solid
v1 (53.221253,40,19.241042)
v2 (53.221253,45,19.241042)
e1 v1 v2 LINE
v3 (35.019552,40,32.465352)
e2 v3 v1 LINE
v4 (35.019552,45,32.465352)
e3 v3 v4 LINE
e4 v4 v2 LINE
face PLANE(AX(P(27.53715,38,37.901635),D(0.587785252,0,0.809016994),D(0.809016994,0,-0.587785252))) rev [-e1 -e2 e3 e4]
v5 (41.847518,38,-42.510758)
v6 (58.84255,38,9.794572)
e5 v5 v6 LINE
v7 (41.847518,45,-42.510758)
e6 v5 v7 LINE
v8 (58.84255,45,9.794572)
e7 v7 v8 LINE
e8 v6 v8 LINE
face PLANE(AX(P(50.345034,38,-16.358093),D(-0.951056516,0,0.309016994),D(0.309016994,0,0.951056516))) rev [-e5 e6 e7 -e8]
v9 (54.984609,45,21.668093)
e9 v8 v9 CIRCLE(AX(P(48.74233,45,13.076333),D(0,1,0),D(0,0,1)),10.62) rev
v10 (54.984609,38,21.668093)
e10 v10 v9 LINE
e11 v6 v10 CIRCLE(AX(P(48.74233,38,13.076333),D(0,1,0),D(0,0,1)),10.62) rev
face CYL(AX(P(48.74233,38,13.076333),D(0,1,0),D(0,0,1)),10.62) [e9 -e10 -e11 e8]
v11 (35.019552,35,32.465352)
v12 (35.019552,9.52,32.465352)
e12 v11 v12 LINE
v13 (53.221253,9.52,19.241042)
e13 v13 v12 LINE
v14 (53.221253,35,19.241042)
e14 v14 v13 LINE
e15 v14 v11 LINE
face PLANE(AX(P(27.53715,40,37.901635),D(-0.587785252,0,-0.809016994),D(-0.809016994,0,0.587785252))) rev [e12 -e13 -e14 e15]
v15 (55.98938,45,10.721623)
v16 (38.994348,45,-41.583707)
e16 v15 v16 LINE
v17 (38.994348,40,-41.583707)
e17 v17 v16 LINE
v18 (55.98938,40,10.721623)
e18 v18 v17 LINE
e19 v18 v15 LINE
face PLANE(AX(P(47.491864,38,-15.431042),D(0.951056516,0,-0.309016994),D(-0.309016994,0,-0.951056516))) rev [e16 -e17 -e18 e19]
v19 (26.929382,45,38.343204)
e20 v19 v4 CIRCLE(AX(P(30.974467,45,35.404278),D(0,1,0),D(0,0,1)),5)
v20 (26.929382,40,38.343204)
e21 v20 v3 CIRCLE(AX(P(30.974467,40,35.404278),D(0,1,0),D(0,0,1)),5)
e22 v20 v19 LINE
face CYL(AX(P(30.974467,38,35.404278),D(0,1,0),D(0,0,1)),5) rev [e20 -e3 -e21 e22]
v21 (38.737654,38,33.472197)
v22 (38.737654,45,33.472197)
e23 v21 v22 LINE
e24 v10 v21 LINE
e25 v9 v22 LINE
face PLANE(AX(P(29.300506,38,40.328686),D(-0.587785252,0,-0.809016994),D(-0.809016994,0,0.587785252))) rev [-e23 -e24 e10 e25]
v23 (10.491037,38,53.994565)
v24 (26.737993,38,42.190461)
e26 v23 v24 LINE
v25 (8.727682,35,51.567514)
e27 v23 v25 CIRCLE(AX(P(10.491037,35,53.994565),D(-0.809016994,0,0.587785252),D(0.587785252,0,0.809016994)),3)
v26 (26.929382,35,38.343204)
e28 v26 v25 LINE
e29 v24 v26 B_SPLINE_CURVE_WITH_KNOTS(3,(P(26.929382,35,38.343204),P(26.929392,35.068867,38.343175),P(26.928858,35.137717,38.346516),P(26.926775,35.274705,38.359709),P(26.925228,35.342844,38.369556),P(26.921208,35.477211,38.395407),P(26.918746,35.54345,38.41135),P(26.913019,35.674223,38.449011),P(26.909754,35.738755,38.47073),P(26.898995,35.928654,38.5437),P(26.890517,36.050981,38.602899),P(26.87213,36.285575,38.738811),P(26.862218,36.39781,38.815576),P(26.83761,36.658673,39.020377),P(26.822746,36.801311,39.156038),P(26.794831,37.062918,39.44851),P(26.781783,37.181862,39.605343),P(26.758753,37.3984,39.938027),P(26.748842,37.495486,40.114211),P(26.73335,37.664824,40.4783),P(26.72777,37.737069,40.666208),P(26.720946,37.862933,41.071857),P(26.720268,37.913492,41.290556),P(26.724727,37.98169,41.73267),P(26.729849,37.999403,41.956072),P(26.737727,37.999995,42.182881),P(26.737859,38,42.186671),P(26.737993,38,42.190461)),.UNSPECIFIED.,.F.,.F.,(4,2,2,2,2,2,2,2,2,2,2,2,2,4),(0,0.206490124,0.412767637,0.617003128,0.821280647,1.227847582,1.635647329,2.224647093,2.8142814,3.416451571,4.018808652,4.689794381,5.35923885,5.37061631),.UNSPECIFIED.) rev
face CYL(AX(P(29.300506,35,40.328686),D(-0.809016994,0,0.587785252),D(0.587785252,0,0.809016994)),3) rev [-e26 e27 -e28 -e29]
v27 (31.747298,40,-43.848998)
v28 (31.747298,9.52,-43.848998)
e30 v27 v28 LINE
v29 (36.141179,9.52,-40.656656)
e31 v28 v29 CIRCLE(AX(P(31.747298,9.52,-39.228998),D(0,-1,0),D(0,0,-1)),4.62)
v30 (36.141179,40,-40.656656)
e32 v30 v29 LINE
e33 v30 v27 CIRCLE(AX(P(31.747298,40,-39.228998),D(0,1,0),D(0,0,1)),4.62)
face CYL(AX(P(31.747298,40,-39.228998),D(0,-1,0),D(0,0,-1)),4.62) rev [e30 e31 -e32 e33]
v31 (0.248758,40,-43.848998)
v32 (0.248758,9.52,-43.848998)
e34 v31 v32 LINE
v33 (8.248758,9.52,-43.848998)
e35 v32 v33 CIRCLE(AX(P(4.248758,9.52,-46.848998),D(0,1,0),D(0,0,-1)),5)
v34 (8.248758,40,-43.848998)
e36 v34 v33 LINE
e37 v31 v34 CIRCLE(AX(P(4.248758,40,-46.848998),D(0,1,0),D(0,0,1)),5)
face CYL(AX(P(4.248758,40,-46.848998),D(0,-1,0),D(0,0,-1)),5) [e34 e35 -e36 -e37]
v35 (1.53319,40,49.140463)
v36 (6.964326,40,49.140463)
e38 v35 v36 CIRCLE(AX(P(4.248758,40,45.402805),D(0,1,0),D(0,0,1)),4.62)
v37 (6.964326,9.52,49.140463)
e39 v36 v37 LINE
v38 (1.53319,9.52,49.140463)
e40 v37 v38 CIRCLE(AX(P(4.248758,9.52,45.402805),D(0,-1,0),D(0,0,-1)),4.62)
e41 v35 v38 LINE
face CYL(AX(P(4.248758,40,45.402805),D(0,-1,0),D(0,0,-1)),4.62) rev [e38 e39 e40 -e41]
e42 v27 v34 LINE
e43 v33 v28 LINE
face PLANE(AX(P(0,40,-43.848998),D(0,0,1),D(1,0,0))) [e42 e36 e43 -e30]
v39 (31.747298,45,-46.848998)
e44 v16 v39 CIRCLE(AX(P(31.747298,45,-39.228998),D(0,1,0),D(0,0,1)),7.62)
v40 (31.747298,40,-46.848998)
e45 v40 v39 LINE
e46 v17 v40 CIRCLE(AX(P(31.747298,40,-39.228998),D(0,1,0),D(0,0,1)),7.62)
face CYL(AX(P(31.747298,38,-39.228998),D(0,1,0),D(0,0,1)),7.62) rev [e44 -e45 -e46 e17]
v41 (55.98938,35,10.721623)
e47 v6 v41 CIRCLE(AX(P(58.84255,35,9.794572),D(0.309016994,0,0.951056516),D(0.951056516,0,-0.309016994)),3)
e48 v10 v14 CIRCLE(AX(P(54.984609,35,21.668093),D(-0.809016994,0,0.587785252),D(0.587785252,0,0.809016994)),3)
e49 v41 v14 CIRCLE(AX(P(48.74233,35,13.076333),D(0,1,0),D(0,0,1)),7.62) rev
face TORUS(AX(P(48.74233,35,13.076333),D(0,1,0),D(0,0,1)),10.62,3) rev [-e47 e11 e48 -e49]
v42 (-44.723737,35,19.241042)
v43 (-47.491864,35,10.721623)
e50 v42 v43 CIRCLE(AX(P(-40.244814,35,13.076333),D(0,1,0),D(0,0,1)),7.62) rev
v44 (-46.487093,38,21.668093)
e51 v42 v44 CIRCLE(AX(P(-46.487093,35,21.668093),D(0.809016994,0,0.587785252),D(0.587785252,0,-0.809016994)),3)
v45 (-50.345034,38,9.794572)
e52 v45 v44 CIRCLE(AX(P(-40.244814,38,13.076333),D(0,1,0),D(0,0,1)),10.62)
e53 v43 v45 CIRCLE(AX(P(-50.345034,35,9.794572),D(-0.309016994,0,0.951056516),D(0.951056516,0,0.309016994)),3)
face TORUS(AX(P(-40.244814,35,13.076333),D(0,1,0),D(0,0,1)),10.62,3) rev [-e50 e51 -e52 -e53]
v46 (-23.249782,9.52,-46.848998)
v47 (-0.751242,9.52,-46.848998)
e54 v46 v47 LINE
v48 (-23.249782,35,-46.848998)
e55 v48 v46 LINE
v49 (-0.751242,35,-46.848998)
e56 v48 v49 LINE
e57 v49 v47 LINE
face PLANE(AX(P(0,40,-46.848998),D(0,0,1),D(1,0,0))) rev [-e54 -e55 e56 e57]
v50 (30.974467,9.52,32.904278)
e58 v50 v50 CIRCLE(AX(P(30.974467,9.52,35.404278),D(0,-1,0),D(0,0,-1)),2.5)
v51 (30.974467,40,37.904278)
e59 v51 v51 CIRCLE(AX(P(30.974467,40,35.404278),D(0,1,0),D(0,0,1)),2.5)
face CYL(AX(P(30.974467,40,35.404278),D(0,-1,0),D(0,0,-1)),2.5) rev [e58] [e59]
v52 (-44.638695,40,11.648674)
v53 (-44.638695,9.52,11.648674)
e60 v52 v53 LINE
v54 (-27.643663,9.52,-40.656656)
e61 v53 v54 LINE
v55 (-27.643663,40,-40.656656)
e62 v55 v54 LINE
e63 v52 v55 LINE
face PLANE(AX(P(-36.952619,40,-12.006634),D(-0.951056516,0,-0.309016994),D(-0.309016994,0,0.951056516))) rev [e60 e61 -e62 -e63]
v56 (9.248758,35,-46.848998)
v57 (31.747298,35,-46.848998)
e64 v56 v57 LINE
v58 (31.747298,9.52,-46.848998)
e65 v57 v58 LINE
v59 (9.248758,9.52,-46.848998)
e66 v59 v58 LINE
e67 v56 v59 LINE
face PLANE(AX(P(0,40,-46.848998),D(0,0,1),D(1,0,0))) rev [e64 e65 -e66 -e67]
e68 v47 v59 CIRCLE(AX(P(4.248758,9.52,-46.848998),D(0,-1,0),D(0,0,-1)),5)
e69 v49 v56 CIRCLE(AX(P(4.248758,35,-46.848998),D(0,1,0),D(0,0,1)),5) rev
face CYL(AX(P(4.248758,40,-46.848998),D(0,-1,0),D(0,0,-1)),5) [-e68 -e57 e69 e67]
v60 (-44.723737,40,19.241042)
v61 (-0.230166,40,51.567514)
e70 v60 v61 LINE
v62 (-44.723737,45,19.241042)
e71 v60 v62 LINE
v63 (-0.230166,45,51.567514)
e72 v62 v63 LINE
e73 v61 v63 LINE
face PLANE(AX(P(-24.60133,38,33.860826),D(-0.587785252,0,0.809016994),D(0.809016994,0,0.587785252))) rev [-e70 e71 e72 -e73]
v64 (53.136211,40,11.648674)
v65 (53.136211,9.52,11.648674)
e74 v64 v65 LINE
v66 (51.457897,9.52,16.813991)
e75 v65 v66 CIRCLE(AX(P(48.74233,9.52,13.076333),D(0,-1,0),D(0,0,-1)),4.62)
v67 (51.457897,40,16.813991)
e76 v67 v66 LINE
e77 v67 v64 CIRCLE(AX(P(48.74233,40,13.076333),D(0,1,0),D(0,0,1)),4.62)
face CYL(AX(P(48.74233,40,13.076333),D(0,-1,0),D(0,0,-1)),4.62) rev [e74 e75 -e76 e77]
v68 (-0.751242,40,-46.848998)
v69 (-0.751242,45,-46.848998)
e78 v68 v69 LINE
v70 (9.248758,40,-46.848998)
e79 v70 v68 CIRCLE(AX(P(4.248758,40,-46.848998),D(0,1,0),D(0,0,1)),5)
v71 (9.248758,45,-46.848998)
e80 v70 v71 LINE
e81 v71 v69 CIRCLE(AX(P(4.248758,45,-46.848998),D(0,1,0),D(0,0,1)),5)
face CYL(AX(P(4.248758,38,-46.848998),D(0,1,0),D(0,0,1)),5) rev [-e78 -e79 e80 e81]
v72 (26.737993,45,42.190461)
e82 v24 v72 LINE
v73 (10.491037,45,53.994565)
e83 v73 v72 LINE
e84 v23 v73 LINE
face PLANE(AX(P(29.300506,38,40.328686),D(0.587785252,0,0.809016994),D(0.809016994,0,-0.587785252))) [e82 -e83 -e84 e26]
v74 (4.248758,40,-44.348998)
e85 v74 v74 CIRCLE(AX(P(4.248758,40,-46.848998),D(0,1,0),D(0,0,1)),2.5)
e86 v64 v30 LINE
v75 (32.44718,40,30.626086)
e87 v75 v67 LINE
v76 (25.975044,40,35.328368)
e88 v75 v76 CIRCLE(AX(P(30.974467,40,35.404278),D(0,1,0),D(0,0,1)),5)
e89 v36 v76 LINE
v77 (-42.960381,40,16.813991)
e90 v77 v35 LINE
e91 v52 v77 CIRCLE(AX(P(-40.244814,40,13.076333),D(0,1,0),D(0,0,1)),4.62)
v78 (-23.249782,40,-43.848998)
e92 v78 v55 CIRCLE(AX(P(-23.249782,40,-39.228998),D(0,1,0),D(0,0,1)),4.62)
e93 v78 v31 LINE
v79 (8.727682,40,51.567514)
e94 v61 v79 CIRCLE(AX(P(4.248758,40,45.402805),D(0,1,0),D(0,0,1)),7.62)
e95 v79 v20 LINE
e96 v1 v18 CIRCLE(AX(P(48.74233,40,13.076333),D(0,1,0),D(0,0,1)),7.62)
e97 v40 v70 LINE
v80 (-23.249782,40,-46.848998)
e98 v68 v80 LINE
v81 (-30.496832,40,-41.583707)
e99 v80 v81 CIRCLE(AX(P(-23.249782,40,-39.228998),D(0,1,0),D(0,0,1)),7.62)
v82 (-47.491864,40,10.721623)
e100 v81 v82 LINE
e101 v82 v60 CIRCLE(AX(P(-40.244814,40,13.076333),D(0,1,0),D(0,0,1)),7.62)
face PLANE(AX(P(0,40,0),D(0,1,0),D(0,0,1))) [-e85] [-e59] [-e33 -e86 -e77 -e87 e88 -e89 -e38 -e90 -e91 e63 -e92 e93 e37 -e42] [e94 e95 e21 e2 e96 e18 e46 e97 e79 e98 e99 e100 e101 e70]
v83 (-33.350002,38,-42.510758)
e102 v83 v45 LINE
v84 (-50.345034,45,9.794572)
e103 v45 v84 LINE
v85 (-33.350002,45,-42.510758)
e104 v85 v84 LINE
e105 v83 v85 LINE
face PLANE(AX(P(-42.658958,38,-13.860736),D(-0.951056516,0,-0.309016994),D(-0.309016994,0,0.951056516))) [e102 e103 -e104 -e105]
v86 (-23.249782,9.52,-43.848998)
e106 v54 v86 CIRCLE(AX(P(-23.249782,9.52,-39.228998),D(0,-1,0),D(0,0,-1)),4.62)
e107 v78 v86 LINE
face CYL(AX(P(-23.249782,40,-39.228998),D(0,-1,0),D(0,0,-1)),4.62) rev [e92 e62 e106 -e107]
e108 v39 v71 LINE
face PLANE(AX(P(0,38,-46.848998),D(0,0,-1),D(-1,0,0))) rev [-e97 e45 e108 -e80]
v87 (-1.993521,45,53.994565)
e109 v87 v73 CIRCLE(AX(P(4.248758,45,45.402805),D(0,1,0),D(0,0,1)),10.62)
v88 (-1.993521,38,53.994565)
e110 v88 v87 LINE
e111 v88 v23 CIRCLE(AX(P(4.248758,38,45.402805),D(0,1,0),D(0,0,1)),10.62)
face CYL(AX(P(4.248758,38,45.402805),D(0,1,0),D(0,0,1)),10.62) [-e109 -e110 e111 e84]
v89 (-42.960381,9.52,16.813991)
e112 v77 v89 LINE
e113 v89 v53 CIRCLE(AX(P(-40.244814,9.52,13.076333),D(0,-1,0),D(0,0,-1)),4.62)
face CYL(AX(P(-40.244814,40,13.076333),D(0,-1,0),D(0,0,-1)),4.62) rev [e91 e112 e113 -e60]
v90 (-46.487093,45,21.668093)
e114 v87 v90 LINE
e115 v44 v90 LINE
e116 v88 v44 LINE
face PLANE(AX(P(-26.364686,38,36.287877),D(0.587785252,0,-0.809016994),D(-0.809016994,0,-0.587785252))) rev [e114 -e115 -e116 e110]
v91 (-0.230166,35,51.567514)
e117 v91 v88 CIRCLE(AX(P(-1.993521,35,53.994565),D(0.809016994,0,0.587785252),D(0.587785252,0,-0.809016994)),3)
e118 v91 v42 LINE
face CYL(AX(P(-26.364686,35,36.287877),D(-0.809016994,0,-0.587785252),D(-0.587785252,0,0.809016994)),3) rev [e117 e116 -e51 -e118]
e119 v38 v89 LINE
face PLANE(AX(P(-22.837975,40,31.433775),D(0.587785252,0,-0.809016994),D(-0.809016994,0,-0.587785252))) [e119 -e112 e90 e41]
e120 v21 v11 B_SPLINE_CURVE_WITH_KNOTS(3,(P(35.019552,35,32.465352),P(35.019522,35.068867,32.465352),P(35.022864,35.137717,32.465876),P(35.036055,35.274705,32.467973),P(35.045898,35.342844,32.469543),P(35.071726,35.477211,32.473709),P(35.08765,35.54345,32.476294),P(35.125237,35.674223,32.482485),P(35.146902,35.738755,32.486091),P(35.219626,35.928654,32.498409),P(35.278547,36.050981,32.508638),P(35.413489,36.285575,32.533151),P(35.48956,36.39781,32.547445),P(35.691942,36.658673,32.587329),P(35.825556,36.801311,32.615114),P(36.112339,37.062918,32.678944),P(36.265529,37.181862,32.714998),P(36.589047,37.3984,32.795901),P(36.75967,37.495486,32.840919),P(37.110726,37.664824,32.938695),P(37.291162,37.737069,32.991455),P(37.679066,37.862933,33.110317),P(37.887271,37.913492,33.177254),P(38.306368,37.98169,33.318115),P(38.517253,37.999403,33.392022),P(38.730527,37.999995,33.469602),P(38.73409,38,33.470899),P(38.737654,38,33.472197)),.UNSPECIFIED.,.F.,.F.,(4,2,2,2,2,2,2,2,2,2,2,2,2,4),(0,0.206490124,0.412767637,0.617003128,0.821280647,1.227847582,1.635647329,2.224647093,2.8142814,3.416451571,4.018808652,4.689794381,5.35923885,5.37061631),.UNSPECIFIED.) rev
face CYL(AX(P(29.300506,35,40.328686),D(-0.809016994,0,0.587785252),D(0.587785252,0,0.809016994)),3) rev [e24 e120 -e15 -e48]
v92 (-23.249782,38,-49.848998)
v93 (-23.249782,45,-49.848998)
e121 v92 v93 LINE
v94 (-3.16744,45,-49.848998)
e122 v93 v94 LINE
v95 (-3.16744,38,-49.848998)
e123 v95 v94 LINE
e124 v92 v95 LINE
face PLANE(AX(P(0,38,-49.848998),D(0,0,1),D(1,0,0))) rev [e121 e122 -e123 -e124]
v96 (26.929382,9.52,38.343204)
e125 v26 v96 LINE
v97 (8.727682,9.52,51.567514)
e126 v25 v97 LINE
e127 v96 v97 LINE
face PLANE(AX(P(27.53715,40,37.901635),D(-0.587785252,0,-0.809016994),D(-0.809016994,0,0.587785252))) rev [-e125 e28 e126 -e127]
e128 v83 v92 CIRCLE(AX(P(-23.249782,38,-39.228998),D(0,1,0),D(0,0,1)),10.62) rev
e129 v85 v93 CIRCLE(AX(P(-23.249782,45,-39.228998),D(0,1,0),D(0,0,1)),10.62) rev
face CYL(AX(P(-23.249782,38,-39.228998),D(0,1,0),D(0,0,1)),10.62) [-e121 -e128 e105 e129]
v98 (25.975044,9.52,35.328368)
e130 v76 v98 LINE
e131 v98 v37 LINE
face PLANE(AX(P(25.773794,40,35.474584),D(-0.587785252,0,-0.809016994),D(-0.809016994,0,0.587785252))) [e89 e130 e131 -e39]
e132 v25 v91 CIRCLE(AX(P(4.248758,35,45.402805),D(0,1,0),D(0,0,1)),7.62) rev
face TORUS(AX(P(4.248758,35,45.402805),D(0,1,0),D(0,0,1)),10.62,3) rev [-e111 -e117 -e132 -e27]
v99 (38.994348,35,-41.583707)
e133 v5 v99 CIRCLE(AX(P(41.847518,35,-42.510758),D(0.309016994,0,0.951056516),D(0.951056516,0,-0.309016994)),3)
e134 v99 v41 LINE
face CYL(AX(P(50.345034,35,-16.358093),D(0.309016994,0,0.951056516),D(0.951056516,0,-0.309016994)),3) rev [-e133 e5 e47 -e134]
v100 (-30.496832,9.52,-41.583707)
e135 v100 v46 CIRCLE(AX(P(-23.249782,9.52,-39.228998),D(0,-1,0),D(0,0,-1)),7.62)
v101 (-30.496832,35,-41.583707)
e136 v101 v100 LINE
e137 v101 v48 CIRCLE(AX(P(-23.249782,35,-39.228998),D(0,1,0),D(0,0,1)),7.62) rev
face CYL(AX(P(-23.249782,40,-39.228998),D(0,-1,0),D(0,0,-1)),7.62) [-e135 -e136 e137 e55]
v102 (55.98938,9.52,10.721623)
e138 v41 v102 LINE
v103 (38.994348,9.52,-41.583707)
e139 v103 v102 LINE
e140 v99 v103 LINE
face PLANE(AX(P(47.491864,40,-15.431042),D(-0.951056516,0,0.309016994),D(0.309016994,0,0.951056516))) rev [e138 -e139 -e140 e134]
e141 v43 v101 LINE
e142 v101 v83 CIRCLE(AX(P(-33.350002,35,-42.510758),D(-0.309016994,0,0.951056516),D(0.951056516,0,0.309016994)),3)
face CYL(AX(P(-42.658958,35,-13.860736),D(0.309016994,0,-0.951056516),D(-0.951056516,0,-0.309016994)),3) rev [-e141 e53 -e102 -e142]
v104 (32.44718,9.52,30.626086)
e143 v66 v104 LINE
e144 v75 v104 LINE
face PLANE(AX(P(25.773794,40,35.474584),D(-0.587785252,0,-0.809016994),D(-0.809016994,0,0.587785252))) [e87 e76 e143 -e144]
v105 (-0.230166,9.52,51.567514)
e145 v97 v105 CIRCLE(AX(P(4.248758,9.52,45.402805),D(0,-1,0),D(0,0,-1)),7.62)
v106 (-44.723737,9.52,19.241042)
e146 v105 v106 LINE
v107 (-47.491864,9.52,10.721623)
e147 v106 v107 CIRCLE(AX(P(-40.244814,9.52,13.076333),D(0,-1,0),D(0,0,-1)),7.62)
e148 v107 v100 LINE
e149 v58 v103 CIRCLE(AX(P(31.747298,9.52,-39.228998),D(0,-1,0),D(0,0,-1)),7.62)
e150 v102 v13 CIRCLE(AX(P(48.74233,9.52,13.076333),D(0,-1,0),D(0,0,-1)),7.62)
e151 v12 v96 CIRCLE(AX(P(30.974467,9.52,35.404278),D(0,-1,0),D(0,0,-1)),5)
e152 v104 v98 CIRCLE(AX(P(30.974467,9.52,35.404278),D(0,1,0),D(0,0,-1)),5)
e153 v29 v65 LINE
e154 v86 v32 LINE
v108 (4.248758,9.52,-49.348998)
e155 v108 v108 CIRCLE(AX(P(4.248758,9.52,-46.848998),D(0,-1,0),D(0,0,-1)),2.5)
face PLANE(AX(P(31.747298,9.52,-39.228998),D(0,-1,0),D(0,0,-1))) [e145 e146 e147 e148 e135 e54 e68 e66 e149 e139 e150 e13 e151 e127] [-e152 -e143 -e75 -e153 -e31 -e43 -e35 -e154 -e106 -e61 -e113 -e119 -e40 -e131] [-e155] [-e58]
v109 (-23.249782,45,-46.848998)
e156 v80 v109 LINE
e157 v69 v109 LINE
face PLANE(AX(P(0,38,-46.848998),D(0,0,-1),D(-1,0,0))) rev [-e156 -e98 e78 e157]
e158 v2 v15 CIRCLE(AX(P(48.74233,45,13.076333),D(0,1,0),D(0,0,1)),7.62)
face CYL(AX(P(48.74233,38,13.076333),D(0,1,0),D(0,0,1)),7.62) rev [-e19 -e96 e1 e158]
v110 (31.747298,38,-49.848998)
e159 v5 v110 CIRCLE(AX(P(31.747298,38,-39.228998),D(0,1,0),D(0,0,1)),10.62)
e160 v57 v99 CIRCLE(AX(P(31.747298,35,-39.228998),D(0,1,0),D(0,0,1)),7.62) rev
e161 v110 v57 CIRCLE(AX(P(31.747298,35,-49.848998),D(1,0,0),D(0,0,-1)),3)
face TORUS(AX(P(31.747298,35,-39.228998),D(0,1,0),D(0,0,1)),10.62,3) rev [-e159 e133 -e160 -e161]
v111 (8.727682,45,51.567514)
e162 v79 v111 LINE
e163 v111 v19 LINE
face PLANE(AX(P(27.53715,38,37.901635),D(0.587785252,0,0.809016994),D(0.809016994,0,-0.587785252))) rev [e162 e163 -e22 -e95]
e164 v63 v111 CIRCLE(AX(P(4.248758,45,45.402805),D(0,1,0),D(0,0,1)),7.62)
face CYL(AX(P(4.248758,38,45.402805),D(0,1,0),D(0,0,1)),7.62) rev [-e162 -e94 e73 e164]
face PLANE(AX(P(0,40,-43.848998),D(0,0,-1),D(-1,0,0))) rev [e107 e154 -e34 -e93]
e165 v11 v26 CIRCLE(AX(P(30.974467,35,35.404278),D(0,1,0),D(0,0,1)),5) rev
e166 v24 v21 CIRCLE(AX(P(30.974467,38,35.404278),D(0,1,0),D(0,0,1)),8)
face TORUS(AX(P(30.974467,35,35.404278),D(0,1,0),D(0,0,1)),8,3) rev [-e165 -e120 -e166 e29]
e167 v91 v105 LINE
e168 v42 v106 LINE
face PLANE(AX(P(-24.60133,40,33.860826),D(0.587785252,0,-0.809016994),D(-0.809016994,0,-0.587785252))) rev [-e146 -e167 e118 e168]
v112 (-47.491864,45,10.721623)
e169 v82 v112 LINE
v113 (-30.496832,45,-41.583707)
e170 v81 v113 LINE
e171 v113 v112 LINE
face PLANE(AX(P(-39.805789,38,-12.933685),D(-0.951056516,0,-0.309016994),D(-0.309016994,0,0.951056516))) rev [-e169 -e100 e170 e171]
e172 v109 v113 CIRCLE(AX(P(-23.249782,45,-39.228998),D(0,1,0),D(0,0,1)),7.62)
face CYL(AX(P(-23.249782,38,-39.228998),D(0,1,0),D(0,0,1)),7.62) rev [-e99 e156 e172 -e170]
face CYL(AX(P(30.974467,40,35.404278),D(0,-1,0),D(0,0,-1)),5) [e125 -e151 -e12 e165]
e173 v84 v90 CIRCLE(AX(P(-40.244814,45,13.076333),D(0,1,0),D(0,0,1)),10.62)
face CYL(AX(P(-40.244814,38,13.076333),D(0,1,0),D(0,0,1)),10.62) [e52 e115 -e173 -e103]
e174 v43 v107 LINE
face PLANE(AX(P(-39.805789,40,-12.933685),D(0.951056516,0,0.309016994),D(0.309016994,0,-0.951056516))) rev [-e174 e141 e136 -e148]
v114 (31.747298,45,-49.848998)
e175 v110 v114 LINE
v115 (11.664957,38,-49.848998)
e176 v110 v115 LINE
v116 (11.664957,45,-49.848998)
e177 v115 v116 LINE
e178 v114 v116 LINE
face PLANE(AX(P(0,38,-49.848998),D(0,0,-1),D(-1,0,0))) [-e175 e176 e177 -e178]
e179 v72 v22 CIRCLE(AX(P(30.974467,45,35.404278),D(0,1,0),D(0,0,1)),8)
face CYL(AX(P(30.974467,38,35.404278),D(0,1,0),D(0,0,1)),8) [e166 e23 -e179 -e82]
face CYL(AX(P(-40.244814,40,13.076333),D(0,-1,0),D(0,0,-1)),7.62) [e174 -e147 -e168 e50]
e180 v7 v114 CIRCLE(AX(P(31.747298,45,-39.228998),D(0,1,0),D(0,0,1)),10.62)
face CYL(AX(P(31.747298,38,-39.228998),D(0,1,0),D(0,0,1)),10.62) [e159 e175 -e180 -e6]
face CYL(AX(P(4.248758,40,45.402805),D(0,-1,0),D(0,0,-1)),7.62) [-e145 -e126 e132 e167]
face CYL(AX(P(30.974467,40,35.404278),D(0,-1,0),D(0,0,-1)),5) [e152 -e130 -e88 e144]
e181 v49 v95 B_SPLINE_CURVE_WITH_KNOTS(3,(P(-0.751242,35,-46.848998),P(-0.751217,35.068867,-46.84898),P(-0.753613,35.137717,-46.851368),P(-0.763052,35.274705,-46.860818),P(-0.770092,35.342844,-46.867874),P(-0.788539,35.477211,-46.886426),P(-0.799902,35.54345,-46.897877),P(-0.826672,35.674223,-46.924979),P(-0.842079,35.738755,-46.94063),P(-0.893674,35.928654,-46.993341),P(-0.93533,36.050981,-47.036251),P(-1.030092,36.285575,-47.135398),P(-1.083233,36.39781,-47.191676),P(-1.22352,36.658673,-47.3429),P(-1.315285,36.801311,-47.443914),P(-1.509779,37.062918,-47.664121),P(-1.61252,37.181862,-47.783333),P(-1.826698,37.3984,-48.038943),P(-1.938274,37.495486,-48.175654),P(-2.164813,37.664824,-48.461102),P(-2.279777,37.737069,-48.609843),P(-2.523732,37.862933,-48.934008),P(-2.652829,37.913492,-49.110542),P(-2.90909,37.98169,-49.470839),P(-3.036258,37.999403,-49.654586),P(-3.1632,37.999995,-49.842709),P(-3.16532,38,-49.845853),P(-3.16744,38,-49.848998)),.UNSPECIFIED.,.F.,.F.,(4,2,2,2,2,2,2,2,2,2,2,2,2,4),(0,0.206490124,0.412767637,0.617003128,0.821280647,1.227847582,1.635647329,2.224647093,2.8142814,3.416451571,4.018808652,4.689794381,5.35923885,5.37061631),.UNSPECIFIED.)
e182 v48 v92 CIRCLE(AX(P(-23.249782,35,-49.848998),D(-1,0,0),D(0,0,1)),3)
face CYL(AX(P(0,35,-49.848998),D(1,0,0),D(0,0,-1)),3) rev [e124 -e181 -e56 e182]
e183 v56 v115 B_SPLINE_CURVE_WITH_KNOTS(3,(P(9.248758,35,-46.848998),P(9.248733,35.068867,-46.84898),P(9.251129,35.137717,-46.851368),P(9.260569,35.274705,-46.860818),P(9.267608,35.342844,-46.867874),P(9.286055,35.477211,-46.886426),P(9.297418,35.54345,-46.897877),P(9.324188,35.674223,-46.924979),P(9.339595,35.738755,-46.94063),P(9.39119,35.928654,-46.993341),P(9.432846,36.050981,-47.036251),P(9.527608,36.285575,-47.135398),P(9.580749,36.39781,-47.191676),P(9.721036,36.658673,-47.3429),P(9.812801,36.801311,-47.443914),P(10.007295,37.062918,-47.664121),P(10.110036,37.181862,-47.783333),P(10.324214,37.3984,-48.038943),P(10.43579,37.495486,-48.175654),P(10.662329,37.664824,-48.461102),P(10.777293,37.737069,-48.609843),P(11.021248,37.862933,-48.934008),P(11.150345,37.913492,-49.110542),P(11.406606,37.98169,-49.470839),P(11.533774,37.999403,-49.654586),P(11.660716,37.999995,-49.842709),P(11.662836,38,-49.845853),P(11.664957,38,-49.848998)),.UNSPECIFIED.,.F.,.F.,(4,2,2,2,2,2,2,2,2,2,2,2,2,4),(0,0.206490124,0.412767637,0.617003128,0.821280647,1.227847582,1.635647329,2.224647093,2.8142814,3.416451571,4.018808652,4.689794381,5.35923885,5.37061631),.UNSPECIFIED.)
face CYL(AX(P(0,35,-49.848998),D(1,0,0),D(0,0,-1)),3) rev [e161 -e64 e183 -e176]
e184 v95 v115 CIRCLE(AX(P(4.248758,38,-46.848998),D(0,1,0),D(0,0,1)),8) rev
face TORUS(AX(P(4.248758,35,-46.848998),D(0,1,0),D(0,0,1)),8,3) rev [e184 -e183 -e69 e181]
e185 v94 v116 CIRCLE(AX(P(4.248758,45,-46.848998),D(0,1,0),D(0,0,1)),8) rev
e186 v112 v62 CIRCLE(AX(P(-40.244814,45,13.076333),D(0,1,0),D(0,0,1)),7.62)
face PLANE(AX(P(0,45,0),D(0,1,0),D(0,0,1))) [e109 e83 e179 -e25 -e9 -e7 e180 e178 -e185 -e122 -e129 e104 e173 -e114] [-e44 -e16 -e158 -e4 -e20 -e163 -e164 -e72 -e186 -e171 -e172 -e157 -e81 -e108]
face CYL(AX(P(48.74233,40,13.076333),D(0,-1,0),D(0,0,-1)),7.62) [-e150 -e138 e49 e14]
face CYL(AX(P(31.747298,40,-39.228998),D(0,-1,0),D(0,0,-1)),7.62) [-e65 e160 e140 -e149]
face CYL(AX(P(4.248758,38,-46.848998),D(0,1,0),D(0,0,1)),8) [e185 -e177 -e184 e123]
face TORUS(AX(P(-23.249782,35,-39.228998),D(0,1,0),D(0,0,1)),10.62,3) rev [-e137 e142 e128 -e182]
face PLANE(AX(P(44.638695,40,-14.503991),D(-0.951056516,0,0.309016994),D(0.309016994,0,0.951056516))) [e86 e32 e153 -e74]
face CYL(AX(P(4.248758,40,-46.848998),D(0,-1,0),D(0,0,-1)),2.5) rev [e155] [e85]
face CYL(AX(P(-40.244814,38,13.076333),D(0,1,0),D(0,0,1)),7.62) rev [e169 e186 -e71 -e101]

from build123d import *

# Parameters (mm, degrees)
SKETCH1_R                = 2.5
BOSS_EXTRUDE1_DEPTH      = 40
BOSS_EXTRUDE2_DEPTH      = 5
BOSS_EXTRUDE2_DEPTH_BACK = 2
FILLET1_R                = 3
BOSS_EXTRUDE3_START      = 7
SKETCH3_R                = 2.5
BOSS_EXTRUDE3_DEPTH      = 7
SKETCH4_R                = 2.5
CUT_EXTRUDE1_DEPTH       = 16.52


with BuildPart() as part:
    # Sketch1 → Boss-Extrude1 (new body)
    # profile 1 of 3: a face of its own
    with BuildSketch(Plane(origin=(0, 0, 0), x_dir=(1, 0, 0), z_dir=(0, 1, 0))):
        with BuildLine():
            Line((55.989380272, -10.721623107), (38.994348201, 41.58370731))
            ThreePointArc((38.994348201, 41.58370731), (36.22622117, 45.39370731), (31.747297547, 46.848997812))
            Line((31.747297547, 46.848997812), (9.248758018, 46.848997812))
            ThreePointArc((9.248758018, 46.848997812), (7.784291924, 50.384531718), (4.248758018, 51.848997812))
            Line((4.248758018, 51.848997812), (4.248758018, 50.848997812))
            ThreePointArc((4.248758018, 50.848997812), (1.420330893, 49.677424937), (0.248758018, 46.848997812))
            Line((0.248758018, 46.848997812), (-23.249781512, 46.848997812))
            ThreePointArc((-23.249781512, 46.848997812), (-27.728705135, 45.39370731), (-30.496832166, 41.58370731))
            Line((-30.496832166, 41.58370731), (-47.491864237, -10.721623107))
            ThreePointArc((-47.491864237, -10.721623107), (-47.491864237, -15.431042101), (-44.723737205, -19.241042101))
            Line((-44.723737205, -19.241042101), (-0.230165605, -51.567514092))
            ThreePointArc((-0.230165605, -51.567514092), (4.248758018, -53.022804594), (8.72768164, -51.567514092))
            Line((8.72768164, -51.567514092), (27.738399463, -37.755419106))
            ThreePointArc((27.738399463, -37.755419106), (30.34872958, -39.355031459), (33.325608449, -38.640346074))
            Line((33.325608449, -38.640346074), (33.913393702, -39.449363068))
            ThreePointArc((33.913393702, -39.449363068), (35.912909143, -36.186450422), (35.019552412, -32.465351835))
            Line((35.019552412, -32.465351835), (53.22125324, -19.241042101))
            ThreePointArc((53.22125324, -19.241042101), (55.989380272, -15.431042101), (55.989380272, -10.721623107))
        make_face()
        with Locations(Location((4.248758018, 46.848997812, 0), (0, 0, 270))):
            Circle(SKETCH1_R, mode=Mode.SUBTRACT)
        with Locations(Location((30.97446744, -35.404278096, 0), (0, 0, 270))):
            Circle(SKETCH1_R, mode=Mode.SUBTRACT)
        with BuildLine():
            ThreePointArc((-23.249781512, 43.848997812), (-25.965349378, 42.966656326), (-27.643662617, 40.656656326))
            Line((-27.643662617, 40.656656326), (-44.638694688, -11.64867409))
            ThreePointArc((-44.638694688, -11.64867409), (-44.638694688, -14.503991118), (-42.960381448, -16.813991118))
            Line((-42.960381448, -16.813991118), (1.533190152, -49.140463108))
            ThreePointArc((1.533190152, -49.140463108), (4.248758018, -50.022804594), (6.964325883, -49.140463108))
            Line((6.964325883, -49.140463108), (25.975043706, -35.328368122))
            ThreePointArc((25.975043706, -35.328368122), (28.035541179, -31.359193125), (32.447179661, -30.626086104))
            Line((32.447179661, -30.626086104), (51.457897483, -16.813991118))
            ThreePointArc((51.457897483, -16.813991118), (53.136210723, -14.503991118), (53.136210723, -11.64867409))
            Line((53.136210723, -11.64867409), (36.141178653, 40.656656326))
            ThreePointArc((36.141178653, 40.656656326), (34.462865413, 42.966656326), (31.747297547, 43.848997812))
            Line((31.747297547, 43.848997812), (8.248758018, 43.848997812))
            ThreePointArc((8.248758018, 43.848997812), (4.248758018, 41.848997812), (0.248758018, 43.848997812))
            Line((0.248758018, 43.848997812), (-23.249781512, 43.848997812))
        make_face(mode=Mode.SUBTRACT)
    # profile 2 of 3: a face of its own
    with BuildSketch(Plane(origin=(0, 0, 0), x_dir=(1, 0, 0), z_dir=(0, 1, 0))):
        with BuildLine():
            ThreePointArc((26.929382468, -38.343204358), (30.192295115, -40.342719799), (33.913393702, -39.449363068))
            Line((33.913393702, -39.449363068), (33.325608449, -38.640346074))
            ThreePointArc((33.325608449, -38.640346074), (30.34872958, -39.355031459), (27.738399463, -37.755419106))
            Line((27.738399463, -37.755419106), (26.929382468, -38.343204358))
        make_face()
    # profile 3 of 3: a face of its own
    with BuildSketch(Plane(origin=(0, 0, 0), x_dir=(1, 0, 0), z_dir=(0, 1, 0))):
        with BuildLine():
            Line((4.248758018, 50.848997812), (4.248758018, 51.848997812))
            ThreePointArc((4.248758018, 51.848997812), (0.713224112, 50.384531718), (-0.751241982, 46.848997812))
            Line((-0.751241982, 46.848997812), (0.248758018, 46.848997812))
            ThreePointArc((0.248758018, 46.848997812), (1.420330893, 49.677424937), (4.248758018, 50.848997812))
        make_face()
    extrude(amount=BOSS_EXTRUDE1_DEPTH)

    # Sketch2 → Boss-Extrude2 (add, two sides: drawn at the far end of the back side and taken through both)
    with BuildSketch(Plane(origin=(0, 40, 0), x_dir=(1, 0, 0), z_dir=(0, 1, 0)).offset(-BOSS_EXTRUDE2_DEPTH_BACK)):
        Polygon((-30.496832166, 41.58370731), (-33.350001715, 42.510758293), (-50.345033785, -9.794572124), (-47.491864237, -10.721623107), align=None)
        with BuildLine():
            Line((-1.993521362, -53.994565075), (-46.487092962, -21.668093084))
            ThreePointArc((-46.487092962, -21.668093084), (-50.345033785, -16.358093084), (-50.345033785, -9.794572124))
            Line((-50.345033785, -9.794572124), (-47.491864237, -10.721623107))
            ThreePointArc((-47.491864237, -10.721623107), (-47.491864237, -15.431042101), (-44.723737205, -19.241042101))
            Line((-44.723737205, -19.241042101), (-0.230165605, -51.567514092))
            ThreePointArc((-0.230165605, -51.567514092), (4.248758018, -53.022804594), (8.72768164, -51.567514092))
            Line((8.72768164, -51.567514092), (26.929382468, -38.343204358))
            ThreePointArc((26.929382468, -38.343204358), (33.913393702, -39.449363068), (35.019552412, -32.465351835))
            Line((35.019552412, -32.465351835), (53.22125324, -19.241042101))
            ThreePointArc((53.22125324, -19.241042101), (55.989380272, -15.431042101), (55.989380272, -10.721623107))
            Line((55.989380272, -10.721623107), (38.994348201, 41.58370731))
            ThreePointArc((38.994348201, 41.58370731), (36.22622117, 45.39370731), (31.747297547, 46.848997812))
            Line((31.747297547, 46.848997812), (9.248758018, 46.848997812))
            ThreePointArc((9.248758018, 46.848997812), (4.248758018, 51.848997812), (-0.751241982, 46.848997812))
            Line((-0.751241982, 46.848997812), (-23.249781512, 46.848997812))
            Line((-23.249781512, 46.848997812), (-23.249781512, 49.848997812))
            Line((-23.249781512, 49.848997812), (-3.16744047, 49.848997812))
            ThreePointArc((-3.16744047, 49.848997812), (4.248758018, 54.848997812), (11.664956505, 49.848997812))
            Line((11.664956505, 49.848997812), (31.747297547, 49.848997812))
            ThreePointArc((31.747297547, 49.848997812), (37.989576927, 47.820758293), (41.84751775, 42.510758293))
            Line((41.84751775, 42.510758293), (58.842549821, -9.794572124))
            ThreePointArc((58.842549821, -9.794572124), (58.842549821, -16.358093084), (54.984608997, -21.668093084))
            Line((54.984608997, -21.668093084), (38.737653807, -33.472196981))
            ThreePointArc((38.737653807, -33.472196981), (35.676749458, -41.876414051), (26.737992587, -42.190461178))
            Line((26.737992587, -42.190461178), (10.491037397, -53.994565075))
            ThreePointArc((10.491037397, -53.994565075), (4.248758018, -56.022804594), (-1.993521362, -53.994565075))
        make_face()
        with BuildLine():
            ThreePointArc((-33.350001715, 42.510758293), (-29.492060891, 47.820758293), (-23.249781512, 49.848997812))
            Line((-23.249781512, 49.848997812), (-23.249781512, 46.848997812))
            ThreePointArc((-23.249781512, 46.848997812), (-27.728705135, 45.39370731), (-30.496832166, 41.58370731))
            Line((-30.496832166, 41.58370731), (-33.350001715, 42.510758293))
        make_face()
    extrude(amount=BOSS_EXTRUDE2_DEPTH + BOSS_EXTRUDE2_DEPTH_BACK)

    # Fillet1
    fillet1_edges = [part.edges().sort_by_distance(p)[0] for p in [
        (-38.994348201, 38, -15.431042101),
        (-47.491864237, 38, 15.431042101),
        (-22.476951405, 38, 35.404278096),
        (4.248758018, 38, 53.022804594),
        (17.828532054, 38, 44.955359225),
        (33.913393702, 38, 39.449363068),
        (44.120402826, 38, 25.853196968),
        (55.989380272, 38, 15.431042101),
        (47.491864237, 38, -15.431042101),
        (36.22622117, 38, -45.39370731),
        (20.498027782, 38, -46.848997812),
        (4.248758018, 38, -51.848997812),
        (-12.000511747, 38, -46.848997812),
        (-27.728705135, 38, -45.39370731),
    ]]
    fillet(fillet1_edges, radius=FILLET1_R - 0.0001)  # a hair under: the kernel refuses the full size

    # Sketch3 → Boss-Extrude3 (add)
    with BuildSketch(Plane.XZ.offset(BOSS_EXTRUDE3_START)):
        with BuildLine():
            Line((38.994348201, -41.58370731), (55.989380272, 10.721623107))
            ThreePointArc((55.989380272, 10.721623107), (55.989380272, 15.431042101), (53.22125324, 19.241042101))
            Line((53.22125324, 19.241042101), (35.019552412, 32.465351835))
            ThreePointArc((35.019552412, 32.465351835), (33.913393702, 39.449363068), (26.929382468, 38.343204358))
            Line((26.929382468, 38.343204358), (8.72768164, 51.567514092))
            ThreePointArc((8.72768164, 51.567514092), (4.248758018, 53.022804594), (-0.230165605, 51.567514092))
            Line((-0.230165605, 51.567514092), (-44.723737205, 19.241042101))
            ThreePointArc((-44.723737205, 19.241042101), (-47.491864237, 15.431042101), (-47.491864237, 10.721623107))
            Line((-47.491864237, 10.721623107), (-30.496832166, -41.58370731))
            ThreePointArc((-30.496832166, -41.58370731), (-27.728705135, -45.39370731), (-23.249781512, -46.848997812))
            Line((-23.249781512, -46.848997812), (-0.751241982, -46.848997812))
            ThreePointArc((-0.751241982, -46.848997812), (4.248758018, -51.848997812), (9.248758018, -46.848997812))
            Line((9.248758018, -46.848997812), (31.747297547, -46.848997812))
            ThreePointArc((31.747297547, -46.848997812), (36.22622117, -45.39370731), (38.994348201, -41.58370731))
        make_face()
        with Locations(Location((30.97446744, 35.404278096, 0), (0, 0, 270))):
            Circle(SKETCH3_R, mode=Mode.SUBTRACT)
        with Locations(Location((4.248758018, -46.848997812, 0), (0, 0, 270))):
            Circle(SKETCH3_R, mode=Mode.SUBTRACT)
        with BuildLine():
            Line((-44.638694688, 11.64867409), (-27.643662617, -40.656656326))
            ThreePointArc((-27.643662617, -40.656656326), (-25.965349378, -42.966656326), (-23.249781512, -43.848997812))
            Line((-23.249781512, -43.848997812), (0.248758018, -43.848997812))
            ThreePointArc((0.248758018, -43.848997812), (4.248758018, -41.848997812), (8.248758018, -43.848997812))
            Line((8.248758018, -43.848997812), (31.747297547, -43.848997812))
            ThreePointArc((31.747297547, -43.848997812), (34.462865413, -42.966656326), (36.141178653, -40.656656326))
            Line((36.141178653, -40.656656326), (53.136210723, 11.64867409))
            ThreePointArc((53.136210723, 11.64867409), (53.136210723, 14.503991118), (51.457897483, 16.813991118))
            Line((51.457897483, 16.813991118), (32.447179661, 30.626086104))
            ThreePointArc((32.447179661, 30.626086104), (28.035541179, 31.359193125), (25.975043706, 35.328368122))
            Line((25.975043706, 35.328368122), (6.964325883, 49.140463108))
            ThreePointArc((6.964325883, 49.140463108), (4.248758018, 50.022804594), (1.533190152, 49.140463108))
            Line((1.533190152, 49.140463108), (-42.960381448, 16.813991118))
            ThreePointArc((-42.960381448, 16.813991118), (-44.638694688, 14.503991118), (-44.638694688, 11.64867409))
        make_face(mode=Mode.SUBTRACT)
    extrude(amount=-BOSS_EXTRUDE3_DEPTH)

    # Sketch4 → Cut-Extrude1 (cut)
    with BuildSketch(Plane.XZ.offset(7)):
        with BuildLine():
            Line((38.994348201, -41.58370731), (55.989380272, 10.721623107))
            ThreePointArc((55.989380272, 10.721623107), (55.989380272, 15.431042101), (53.22125324, 19.241042101))
            Line((53.22125324, 19.241042101), (35.019552412, 32.465351835))
            ThreePointArc((35.019552412, 32.465351835), (33.913393702, 39.449363068), (26.929382468, 38.343204358))
            Line((26.929382468, 38.343204358), (8.72768164, 51.567514092))
            ThreePointArc((8.72768164, 51.567514092), (4.248758018, 53.022804594), (-0.230165605, 51.567514092))
            Line((-0.230165605, 51.567514092), (-44.723737205, 19.241042101))
            ThreePointArc((-44.723737205, 19.241042101), (-47.491864237, 15.431042101), (-47.491864237, 10.721623107))
            Line((-47.491864237, 10.721623107), (-30.496832166, -41.58370731))
            ThreePointArc((-30.496832166, -41.58370731), (-27.728705135, -45.39370731), (-23.249781512, -46.848997812))
            Line((-23.249781512, -46.848997812), (-0.751241982, -46.848997812))
            ThreePointArc((-0.751241982, -46.848997812), (4.248758018, -51.848997812), (9.248758018, -46.848997812))
            Line((9.248758018, -46.848997812), (31.747297547, -46.848997812))
            ThreePointArc((31.747297547, -46.848997812), (36.22622117, -45.39370731), (38.994348201, -41.58370731))
        make_face()
        with Locations(Location((30.97446744, 35.404278096, 0), (0, 0, 270))):
            Circle(SKETCH4_R, mode=Mode.SUBTRACT)
        with Locations(Location((4.248758018, -46.848997812, 0), (0, 0, 270))):
            Circle(SKETCH4_R, mode=Mode.SUBTRACT)
        with BuildLine():
            Line((-23.249781512, -43.848997812), (0.248758018, -43.848997812))
            ThreePointArc((0.248758018, -43.848997812), (4.248758018, -41.848997812), (8.248758018, -43.848997812))
            Line((8.248758018, -43.848997812), (31.747297547, -43.848997812))
            ThreePointArc((31.747297547, -43.848997812), (34.462865413, -42.966656326), (36.141178653, -40.656656326))
            Line((36.141178653, -40.656656326), (53.136210723, 11.64867409))
            ThreePointArc((53.136210723, 11.64867409), (53.136210723, 14.503991118), (51.457897483, 16.813991118))
            Line((51.457897483, 16.813991118), (32.447179661, 30.626086104))
            ThreePointArc((32.447179661, 30.626086104), (28.035541179, 31.359193125), (25.975043706, 35.328368122))
            Line((25.975043706, 35.328368122), (6.964325883, 49.140463108))
            ThreePointArc((6.964325883, 49.140463108), (4.248758018, 50.022804594), (1.533190152, 49.140463108))
            Line((1.533190152, 49.140463108), (-42.960381448, 16.813991118))
            ThreePointArc((-42.960381448, 16.813991118), (-44.638694688, 14.503991118), (-44.638694688, 11.64867409))
            Line((-44.638694688, 11.64867409), (-27.643662617, -40.656656326))
            ThreePointArc((-27.643662617, -40.656656326), (-25.965349378, -42.966656326), (-23.249781512, -43.848997812))
        make_face(mode=Mode.SUBTRACT)
    extrude(amount=-CUT_EXTRUDE1_DEPTH, mode=Mode.SUBTRACT)


solid = part.part
